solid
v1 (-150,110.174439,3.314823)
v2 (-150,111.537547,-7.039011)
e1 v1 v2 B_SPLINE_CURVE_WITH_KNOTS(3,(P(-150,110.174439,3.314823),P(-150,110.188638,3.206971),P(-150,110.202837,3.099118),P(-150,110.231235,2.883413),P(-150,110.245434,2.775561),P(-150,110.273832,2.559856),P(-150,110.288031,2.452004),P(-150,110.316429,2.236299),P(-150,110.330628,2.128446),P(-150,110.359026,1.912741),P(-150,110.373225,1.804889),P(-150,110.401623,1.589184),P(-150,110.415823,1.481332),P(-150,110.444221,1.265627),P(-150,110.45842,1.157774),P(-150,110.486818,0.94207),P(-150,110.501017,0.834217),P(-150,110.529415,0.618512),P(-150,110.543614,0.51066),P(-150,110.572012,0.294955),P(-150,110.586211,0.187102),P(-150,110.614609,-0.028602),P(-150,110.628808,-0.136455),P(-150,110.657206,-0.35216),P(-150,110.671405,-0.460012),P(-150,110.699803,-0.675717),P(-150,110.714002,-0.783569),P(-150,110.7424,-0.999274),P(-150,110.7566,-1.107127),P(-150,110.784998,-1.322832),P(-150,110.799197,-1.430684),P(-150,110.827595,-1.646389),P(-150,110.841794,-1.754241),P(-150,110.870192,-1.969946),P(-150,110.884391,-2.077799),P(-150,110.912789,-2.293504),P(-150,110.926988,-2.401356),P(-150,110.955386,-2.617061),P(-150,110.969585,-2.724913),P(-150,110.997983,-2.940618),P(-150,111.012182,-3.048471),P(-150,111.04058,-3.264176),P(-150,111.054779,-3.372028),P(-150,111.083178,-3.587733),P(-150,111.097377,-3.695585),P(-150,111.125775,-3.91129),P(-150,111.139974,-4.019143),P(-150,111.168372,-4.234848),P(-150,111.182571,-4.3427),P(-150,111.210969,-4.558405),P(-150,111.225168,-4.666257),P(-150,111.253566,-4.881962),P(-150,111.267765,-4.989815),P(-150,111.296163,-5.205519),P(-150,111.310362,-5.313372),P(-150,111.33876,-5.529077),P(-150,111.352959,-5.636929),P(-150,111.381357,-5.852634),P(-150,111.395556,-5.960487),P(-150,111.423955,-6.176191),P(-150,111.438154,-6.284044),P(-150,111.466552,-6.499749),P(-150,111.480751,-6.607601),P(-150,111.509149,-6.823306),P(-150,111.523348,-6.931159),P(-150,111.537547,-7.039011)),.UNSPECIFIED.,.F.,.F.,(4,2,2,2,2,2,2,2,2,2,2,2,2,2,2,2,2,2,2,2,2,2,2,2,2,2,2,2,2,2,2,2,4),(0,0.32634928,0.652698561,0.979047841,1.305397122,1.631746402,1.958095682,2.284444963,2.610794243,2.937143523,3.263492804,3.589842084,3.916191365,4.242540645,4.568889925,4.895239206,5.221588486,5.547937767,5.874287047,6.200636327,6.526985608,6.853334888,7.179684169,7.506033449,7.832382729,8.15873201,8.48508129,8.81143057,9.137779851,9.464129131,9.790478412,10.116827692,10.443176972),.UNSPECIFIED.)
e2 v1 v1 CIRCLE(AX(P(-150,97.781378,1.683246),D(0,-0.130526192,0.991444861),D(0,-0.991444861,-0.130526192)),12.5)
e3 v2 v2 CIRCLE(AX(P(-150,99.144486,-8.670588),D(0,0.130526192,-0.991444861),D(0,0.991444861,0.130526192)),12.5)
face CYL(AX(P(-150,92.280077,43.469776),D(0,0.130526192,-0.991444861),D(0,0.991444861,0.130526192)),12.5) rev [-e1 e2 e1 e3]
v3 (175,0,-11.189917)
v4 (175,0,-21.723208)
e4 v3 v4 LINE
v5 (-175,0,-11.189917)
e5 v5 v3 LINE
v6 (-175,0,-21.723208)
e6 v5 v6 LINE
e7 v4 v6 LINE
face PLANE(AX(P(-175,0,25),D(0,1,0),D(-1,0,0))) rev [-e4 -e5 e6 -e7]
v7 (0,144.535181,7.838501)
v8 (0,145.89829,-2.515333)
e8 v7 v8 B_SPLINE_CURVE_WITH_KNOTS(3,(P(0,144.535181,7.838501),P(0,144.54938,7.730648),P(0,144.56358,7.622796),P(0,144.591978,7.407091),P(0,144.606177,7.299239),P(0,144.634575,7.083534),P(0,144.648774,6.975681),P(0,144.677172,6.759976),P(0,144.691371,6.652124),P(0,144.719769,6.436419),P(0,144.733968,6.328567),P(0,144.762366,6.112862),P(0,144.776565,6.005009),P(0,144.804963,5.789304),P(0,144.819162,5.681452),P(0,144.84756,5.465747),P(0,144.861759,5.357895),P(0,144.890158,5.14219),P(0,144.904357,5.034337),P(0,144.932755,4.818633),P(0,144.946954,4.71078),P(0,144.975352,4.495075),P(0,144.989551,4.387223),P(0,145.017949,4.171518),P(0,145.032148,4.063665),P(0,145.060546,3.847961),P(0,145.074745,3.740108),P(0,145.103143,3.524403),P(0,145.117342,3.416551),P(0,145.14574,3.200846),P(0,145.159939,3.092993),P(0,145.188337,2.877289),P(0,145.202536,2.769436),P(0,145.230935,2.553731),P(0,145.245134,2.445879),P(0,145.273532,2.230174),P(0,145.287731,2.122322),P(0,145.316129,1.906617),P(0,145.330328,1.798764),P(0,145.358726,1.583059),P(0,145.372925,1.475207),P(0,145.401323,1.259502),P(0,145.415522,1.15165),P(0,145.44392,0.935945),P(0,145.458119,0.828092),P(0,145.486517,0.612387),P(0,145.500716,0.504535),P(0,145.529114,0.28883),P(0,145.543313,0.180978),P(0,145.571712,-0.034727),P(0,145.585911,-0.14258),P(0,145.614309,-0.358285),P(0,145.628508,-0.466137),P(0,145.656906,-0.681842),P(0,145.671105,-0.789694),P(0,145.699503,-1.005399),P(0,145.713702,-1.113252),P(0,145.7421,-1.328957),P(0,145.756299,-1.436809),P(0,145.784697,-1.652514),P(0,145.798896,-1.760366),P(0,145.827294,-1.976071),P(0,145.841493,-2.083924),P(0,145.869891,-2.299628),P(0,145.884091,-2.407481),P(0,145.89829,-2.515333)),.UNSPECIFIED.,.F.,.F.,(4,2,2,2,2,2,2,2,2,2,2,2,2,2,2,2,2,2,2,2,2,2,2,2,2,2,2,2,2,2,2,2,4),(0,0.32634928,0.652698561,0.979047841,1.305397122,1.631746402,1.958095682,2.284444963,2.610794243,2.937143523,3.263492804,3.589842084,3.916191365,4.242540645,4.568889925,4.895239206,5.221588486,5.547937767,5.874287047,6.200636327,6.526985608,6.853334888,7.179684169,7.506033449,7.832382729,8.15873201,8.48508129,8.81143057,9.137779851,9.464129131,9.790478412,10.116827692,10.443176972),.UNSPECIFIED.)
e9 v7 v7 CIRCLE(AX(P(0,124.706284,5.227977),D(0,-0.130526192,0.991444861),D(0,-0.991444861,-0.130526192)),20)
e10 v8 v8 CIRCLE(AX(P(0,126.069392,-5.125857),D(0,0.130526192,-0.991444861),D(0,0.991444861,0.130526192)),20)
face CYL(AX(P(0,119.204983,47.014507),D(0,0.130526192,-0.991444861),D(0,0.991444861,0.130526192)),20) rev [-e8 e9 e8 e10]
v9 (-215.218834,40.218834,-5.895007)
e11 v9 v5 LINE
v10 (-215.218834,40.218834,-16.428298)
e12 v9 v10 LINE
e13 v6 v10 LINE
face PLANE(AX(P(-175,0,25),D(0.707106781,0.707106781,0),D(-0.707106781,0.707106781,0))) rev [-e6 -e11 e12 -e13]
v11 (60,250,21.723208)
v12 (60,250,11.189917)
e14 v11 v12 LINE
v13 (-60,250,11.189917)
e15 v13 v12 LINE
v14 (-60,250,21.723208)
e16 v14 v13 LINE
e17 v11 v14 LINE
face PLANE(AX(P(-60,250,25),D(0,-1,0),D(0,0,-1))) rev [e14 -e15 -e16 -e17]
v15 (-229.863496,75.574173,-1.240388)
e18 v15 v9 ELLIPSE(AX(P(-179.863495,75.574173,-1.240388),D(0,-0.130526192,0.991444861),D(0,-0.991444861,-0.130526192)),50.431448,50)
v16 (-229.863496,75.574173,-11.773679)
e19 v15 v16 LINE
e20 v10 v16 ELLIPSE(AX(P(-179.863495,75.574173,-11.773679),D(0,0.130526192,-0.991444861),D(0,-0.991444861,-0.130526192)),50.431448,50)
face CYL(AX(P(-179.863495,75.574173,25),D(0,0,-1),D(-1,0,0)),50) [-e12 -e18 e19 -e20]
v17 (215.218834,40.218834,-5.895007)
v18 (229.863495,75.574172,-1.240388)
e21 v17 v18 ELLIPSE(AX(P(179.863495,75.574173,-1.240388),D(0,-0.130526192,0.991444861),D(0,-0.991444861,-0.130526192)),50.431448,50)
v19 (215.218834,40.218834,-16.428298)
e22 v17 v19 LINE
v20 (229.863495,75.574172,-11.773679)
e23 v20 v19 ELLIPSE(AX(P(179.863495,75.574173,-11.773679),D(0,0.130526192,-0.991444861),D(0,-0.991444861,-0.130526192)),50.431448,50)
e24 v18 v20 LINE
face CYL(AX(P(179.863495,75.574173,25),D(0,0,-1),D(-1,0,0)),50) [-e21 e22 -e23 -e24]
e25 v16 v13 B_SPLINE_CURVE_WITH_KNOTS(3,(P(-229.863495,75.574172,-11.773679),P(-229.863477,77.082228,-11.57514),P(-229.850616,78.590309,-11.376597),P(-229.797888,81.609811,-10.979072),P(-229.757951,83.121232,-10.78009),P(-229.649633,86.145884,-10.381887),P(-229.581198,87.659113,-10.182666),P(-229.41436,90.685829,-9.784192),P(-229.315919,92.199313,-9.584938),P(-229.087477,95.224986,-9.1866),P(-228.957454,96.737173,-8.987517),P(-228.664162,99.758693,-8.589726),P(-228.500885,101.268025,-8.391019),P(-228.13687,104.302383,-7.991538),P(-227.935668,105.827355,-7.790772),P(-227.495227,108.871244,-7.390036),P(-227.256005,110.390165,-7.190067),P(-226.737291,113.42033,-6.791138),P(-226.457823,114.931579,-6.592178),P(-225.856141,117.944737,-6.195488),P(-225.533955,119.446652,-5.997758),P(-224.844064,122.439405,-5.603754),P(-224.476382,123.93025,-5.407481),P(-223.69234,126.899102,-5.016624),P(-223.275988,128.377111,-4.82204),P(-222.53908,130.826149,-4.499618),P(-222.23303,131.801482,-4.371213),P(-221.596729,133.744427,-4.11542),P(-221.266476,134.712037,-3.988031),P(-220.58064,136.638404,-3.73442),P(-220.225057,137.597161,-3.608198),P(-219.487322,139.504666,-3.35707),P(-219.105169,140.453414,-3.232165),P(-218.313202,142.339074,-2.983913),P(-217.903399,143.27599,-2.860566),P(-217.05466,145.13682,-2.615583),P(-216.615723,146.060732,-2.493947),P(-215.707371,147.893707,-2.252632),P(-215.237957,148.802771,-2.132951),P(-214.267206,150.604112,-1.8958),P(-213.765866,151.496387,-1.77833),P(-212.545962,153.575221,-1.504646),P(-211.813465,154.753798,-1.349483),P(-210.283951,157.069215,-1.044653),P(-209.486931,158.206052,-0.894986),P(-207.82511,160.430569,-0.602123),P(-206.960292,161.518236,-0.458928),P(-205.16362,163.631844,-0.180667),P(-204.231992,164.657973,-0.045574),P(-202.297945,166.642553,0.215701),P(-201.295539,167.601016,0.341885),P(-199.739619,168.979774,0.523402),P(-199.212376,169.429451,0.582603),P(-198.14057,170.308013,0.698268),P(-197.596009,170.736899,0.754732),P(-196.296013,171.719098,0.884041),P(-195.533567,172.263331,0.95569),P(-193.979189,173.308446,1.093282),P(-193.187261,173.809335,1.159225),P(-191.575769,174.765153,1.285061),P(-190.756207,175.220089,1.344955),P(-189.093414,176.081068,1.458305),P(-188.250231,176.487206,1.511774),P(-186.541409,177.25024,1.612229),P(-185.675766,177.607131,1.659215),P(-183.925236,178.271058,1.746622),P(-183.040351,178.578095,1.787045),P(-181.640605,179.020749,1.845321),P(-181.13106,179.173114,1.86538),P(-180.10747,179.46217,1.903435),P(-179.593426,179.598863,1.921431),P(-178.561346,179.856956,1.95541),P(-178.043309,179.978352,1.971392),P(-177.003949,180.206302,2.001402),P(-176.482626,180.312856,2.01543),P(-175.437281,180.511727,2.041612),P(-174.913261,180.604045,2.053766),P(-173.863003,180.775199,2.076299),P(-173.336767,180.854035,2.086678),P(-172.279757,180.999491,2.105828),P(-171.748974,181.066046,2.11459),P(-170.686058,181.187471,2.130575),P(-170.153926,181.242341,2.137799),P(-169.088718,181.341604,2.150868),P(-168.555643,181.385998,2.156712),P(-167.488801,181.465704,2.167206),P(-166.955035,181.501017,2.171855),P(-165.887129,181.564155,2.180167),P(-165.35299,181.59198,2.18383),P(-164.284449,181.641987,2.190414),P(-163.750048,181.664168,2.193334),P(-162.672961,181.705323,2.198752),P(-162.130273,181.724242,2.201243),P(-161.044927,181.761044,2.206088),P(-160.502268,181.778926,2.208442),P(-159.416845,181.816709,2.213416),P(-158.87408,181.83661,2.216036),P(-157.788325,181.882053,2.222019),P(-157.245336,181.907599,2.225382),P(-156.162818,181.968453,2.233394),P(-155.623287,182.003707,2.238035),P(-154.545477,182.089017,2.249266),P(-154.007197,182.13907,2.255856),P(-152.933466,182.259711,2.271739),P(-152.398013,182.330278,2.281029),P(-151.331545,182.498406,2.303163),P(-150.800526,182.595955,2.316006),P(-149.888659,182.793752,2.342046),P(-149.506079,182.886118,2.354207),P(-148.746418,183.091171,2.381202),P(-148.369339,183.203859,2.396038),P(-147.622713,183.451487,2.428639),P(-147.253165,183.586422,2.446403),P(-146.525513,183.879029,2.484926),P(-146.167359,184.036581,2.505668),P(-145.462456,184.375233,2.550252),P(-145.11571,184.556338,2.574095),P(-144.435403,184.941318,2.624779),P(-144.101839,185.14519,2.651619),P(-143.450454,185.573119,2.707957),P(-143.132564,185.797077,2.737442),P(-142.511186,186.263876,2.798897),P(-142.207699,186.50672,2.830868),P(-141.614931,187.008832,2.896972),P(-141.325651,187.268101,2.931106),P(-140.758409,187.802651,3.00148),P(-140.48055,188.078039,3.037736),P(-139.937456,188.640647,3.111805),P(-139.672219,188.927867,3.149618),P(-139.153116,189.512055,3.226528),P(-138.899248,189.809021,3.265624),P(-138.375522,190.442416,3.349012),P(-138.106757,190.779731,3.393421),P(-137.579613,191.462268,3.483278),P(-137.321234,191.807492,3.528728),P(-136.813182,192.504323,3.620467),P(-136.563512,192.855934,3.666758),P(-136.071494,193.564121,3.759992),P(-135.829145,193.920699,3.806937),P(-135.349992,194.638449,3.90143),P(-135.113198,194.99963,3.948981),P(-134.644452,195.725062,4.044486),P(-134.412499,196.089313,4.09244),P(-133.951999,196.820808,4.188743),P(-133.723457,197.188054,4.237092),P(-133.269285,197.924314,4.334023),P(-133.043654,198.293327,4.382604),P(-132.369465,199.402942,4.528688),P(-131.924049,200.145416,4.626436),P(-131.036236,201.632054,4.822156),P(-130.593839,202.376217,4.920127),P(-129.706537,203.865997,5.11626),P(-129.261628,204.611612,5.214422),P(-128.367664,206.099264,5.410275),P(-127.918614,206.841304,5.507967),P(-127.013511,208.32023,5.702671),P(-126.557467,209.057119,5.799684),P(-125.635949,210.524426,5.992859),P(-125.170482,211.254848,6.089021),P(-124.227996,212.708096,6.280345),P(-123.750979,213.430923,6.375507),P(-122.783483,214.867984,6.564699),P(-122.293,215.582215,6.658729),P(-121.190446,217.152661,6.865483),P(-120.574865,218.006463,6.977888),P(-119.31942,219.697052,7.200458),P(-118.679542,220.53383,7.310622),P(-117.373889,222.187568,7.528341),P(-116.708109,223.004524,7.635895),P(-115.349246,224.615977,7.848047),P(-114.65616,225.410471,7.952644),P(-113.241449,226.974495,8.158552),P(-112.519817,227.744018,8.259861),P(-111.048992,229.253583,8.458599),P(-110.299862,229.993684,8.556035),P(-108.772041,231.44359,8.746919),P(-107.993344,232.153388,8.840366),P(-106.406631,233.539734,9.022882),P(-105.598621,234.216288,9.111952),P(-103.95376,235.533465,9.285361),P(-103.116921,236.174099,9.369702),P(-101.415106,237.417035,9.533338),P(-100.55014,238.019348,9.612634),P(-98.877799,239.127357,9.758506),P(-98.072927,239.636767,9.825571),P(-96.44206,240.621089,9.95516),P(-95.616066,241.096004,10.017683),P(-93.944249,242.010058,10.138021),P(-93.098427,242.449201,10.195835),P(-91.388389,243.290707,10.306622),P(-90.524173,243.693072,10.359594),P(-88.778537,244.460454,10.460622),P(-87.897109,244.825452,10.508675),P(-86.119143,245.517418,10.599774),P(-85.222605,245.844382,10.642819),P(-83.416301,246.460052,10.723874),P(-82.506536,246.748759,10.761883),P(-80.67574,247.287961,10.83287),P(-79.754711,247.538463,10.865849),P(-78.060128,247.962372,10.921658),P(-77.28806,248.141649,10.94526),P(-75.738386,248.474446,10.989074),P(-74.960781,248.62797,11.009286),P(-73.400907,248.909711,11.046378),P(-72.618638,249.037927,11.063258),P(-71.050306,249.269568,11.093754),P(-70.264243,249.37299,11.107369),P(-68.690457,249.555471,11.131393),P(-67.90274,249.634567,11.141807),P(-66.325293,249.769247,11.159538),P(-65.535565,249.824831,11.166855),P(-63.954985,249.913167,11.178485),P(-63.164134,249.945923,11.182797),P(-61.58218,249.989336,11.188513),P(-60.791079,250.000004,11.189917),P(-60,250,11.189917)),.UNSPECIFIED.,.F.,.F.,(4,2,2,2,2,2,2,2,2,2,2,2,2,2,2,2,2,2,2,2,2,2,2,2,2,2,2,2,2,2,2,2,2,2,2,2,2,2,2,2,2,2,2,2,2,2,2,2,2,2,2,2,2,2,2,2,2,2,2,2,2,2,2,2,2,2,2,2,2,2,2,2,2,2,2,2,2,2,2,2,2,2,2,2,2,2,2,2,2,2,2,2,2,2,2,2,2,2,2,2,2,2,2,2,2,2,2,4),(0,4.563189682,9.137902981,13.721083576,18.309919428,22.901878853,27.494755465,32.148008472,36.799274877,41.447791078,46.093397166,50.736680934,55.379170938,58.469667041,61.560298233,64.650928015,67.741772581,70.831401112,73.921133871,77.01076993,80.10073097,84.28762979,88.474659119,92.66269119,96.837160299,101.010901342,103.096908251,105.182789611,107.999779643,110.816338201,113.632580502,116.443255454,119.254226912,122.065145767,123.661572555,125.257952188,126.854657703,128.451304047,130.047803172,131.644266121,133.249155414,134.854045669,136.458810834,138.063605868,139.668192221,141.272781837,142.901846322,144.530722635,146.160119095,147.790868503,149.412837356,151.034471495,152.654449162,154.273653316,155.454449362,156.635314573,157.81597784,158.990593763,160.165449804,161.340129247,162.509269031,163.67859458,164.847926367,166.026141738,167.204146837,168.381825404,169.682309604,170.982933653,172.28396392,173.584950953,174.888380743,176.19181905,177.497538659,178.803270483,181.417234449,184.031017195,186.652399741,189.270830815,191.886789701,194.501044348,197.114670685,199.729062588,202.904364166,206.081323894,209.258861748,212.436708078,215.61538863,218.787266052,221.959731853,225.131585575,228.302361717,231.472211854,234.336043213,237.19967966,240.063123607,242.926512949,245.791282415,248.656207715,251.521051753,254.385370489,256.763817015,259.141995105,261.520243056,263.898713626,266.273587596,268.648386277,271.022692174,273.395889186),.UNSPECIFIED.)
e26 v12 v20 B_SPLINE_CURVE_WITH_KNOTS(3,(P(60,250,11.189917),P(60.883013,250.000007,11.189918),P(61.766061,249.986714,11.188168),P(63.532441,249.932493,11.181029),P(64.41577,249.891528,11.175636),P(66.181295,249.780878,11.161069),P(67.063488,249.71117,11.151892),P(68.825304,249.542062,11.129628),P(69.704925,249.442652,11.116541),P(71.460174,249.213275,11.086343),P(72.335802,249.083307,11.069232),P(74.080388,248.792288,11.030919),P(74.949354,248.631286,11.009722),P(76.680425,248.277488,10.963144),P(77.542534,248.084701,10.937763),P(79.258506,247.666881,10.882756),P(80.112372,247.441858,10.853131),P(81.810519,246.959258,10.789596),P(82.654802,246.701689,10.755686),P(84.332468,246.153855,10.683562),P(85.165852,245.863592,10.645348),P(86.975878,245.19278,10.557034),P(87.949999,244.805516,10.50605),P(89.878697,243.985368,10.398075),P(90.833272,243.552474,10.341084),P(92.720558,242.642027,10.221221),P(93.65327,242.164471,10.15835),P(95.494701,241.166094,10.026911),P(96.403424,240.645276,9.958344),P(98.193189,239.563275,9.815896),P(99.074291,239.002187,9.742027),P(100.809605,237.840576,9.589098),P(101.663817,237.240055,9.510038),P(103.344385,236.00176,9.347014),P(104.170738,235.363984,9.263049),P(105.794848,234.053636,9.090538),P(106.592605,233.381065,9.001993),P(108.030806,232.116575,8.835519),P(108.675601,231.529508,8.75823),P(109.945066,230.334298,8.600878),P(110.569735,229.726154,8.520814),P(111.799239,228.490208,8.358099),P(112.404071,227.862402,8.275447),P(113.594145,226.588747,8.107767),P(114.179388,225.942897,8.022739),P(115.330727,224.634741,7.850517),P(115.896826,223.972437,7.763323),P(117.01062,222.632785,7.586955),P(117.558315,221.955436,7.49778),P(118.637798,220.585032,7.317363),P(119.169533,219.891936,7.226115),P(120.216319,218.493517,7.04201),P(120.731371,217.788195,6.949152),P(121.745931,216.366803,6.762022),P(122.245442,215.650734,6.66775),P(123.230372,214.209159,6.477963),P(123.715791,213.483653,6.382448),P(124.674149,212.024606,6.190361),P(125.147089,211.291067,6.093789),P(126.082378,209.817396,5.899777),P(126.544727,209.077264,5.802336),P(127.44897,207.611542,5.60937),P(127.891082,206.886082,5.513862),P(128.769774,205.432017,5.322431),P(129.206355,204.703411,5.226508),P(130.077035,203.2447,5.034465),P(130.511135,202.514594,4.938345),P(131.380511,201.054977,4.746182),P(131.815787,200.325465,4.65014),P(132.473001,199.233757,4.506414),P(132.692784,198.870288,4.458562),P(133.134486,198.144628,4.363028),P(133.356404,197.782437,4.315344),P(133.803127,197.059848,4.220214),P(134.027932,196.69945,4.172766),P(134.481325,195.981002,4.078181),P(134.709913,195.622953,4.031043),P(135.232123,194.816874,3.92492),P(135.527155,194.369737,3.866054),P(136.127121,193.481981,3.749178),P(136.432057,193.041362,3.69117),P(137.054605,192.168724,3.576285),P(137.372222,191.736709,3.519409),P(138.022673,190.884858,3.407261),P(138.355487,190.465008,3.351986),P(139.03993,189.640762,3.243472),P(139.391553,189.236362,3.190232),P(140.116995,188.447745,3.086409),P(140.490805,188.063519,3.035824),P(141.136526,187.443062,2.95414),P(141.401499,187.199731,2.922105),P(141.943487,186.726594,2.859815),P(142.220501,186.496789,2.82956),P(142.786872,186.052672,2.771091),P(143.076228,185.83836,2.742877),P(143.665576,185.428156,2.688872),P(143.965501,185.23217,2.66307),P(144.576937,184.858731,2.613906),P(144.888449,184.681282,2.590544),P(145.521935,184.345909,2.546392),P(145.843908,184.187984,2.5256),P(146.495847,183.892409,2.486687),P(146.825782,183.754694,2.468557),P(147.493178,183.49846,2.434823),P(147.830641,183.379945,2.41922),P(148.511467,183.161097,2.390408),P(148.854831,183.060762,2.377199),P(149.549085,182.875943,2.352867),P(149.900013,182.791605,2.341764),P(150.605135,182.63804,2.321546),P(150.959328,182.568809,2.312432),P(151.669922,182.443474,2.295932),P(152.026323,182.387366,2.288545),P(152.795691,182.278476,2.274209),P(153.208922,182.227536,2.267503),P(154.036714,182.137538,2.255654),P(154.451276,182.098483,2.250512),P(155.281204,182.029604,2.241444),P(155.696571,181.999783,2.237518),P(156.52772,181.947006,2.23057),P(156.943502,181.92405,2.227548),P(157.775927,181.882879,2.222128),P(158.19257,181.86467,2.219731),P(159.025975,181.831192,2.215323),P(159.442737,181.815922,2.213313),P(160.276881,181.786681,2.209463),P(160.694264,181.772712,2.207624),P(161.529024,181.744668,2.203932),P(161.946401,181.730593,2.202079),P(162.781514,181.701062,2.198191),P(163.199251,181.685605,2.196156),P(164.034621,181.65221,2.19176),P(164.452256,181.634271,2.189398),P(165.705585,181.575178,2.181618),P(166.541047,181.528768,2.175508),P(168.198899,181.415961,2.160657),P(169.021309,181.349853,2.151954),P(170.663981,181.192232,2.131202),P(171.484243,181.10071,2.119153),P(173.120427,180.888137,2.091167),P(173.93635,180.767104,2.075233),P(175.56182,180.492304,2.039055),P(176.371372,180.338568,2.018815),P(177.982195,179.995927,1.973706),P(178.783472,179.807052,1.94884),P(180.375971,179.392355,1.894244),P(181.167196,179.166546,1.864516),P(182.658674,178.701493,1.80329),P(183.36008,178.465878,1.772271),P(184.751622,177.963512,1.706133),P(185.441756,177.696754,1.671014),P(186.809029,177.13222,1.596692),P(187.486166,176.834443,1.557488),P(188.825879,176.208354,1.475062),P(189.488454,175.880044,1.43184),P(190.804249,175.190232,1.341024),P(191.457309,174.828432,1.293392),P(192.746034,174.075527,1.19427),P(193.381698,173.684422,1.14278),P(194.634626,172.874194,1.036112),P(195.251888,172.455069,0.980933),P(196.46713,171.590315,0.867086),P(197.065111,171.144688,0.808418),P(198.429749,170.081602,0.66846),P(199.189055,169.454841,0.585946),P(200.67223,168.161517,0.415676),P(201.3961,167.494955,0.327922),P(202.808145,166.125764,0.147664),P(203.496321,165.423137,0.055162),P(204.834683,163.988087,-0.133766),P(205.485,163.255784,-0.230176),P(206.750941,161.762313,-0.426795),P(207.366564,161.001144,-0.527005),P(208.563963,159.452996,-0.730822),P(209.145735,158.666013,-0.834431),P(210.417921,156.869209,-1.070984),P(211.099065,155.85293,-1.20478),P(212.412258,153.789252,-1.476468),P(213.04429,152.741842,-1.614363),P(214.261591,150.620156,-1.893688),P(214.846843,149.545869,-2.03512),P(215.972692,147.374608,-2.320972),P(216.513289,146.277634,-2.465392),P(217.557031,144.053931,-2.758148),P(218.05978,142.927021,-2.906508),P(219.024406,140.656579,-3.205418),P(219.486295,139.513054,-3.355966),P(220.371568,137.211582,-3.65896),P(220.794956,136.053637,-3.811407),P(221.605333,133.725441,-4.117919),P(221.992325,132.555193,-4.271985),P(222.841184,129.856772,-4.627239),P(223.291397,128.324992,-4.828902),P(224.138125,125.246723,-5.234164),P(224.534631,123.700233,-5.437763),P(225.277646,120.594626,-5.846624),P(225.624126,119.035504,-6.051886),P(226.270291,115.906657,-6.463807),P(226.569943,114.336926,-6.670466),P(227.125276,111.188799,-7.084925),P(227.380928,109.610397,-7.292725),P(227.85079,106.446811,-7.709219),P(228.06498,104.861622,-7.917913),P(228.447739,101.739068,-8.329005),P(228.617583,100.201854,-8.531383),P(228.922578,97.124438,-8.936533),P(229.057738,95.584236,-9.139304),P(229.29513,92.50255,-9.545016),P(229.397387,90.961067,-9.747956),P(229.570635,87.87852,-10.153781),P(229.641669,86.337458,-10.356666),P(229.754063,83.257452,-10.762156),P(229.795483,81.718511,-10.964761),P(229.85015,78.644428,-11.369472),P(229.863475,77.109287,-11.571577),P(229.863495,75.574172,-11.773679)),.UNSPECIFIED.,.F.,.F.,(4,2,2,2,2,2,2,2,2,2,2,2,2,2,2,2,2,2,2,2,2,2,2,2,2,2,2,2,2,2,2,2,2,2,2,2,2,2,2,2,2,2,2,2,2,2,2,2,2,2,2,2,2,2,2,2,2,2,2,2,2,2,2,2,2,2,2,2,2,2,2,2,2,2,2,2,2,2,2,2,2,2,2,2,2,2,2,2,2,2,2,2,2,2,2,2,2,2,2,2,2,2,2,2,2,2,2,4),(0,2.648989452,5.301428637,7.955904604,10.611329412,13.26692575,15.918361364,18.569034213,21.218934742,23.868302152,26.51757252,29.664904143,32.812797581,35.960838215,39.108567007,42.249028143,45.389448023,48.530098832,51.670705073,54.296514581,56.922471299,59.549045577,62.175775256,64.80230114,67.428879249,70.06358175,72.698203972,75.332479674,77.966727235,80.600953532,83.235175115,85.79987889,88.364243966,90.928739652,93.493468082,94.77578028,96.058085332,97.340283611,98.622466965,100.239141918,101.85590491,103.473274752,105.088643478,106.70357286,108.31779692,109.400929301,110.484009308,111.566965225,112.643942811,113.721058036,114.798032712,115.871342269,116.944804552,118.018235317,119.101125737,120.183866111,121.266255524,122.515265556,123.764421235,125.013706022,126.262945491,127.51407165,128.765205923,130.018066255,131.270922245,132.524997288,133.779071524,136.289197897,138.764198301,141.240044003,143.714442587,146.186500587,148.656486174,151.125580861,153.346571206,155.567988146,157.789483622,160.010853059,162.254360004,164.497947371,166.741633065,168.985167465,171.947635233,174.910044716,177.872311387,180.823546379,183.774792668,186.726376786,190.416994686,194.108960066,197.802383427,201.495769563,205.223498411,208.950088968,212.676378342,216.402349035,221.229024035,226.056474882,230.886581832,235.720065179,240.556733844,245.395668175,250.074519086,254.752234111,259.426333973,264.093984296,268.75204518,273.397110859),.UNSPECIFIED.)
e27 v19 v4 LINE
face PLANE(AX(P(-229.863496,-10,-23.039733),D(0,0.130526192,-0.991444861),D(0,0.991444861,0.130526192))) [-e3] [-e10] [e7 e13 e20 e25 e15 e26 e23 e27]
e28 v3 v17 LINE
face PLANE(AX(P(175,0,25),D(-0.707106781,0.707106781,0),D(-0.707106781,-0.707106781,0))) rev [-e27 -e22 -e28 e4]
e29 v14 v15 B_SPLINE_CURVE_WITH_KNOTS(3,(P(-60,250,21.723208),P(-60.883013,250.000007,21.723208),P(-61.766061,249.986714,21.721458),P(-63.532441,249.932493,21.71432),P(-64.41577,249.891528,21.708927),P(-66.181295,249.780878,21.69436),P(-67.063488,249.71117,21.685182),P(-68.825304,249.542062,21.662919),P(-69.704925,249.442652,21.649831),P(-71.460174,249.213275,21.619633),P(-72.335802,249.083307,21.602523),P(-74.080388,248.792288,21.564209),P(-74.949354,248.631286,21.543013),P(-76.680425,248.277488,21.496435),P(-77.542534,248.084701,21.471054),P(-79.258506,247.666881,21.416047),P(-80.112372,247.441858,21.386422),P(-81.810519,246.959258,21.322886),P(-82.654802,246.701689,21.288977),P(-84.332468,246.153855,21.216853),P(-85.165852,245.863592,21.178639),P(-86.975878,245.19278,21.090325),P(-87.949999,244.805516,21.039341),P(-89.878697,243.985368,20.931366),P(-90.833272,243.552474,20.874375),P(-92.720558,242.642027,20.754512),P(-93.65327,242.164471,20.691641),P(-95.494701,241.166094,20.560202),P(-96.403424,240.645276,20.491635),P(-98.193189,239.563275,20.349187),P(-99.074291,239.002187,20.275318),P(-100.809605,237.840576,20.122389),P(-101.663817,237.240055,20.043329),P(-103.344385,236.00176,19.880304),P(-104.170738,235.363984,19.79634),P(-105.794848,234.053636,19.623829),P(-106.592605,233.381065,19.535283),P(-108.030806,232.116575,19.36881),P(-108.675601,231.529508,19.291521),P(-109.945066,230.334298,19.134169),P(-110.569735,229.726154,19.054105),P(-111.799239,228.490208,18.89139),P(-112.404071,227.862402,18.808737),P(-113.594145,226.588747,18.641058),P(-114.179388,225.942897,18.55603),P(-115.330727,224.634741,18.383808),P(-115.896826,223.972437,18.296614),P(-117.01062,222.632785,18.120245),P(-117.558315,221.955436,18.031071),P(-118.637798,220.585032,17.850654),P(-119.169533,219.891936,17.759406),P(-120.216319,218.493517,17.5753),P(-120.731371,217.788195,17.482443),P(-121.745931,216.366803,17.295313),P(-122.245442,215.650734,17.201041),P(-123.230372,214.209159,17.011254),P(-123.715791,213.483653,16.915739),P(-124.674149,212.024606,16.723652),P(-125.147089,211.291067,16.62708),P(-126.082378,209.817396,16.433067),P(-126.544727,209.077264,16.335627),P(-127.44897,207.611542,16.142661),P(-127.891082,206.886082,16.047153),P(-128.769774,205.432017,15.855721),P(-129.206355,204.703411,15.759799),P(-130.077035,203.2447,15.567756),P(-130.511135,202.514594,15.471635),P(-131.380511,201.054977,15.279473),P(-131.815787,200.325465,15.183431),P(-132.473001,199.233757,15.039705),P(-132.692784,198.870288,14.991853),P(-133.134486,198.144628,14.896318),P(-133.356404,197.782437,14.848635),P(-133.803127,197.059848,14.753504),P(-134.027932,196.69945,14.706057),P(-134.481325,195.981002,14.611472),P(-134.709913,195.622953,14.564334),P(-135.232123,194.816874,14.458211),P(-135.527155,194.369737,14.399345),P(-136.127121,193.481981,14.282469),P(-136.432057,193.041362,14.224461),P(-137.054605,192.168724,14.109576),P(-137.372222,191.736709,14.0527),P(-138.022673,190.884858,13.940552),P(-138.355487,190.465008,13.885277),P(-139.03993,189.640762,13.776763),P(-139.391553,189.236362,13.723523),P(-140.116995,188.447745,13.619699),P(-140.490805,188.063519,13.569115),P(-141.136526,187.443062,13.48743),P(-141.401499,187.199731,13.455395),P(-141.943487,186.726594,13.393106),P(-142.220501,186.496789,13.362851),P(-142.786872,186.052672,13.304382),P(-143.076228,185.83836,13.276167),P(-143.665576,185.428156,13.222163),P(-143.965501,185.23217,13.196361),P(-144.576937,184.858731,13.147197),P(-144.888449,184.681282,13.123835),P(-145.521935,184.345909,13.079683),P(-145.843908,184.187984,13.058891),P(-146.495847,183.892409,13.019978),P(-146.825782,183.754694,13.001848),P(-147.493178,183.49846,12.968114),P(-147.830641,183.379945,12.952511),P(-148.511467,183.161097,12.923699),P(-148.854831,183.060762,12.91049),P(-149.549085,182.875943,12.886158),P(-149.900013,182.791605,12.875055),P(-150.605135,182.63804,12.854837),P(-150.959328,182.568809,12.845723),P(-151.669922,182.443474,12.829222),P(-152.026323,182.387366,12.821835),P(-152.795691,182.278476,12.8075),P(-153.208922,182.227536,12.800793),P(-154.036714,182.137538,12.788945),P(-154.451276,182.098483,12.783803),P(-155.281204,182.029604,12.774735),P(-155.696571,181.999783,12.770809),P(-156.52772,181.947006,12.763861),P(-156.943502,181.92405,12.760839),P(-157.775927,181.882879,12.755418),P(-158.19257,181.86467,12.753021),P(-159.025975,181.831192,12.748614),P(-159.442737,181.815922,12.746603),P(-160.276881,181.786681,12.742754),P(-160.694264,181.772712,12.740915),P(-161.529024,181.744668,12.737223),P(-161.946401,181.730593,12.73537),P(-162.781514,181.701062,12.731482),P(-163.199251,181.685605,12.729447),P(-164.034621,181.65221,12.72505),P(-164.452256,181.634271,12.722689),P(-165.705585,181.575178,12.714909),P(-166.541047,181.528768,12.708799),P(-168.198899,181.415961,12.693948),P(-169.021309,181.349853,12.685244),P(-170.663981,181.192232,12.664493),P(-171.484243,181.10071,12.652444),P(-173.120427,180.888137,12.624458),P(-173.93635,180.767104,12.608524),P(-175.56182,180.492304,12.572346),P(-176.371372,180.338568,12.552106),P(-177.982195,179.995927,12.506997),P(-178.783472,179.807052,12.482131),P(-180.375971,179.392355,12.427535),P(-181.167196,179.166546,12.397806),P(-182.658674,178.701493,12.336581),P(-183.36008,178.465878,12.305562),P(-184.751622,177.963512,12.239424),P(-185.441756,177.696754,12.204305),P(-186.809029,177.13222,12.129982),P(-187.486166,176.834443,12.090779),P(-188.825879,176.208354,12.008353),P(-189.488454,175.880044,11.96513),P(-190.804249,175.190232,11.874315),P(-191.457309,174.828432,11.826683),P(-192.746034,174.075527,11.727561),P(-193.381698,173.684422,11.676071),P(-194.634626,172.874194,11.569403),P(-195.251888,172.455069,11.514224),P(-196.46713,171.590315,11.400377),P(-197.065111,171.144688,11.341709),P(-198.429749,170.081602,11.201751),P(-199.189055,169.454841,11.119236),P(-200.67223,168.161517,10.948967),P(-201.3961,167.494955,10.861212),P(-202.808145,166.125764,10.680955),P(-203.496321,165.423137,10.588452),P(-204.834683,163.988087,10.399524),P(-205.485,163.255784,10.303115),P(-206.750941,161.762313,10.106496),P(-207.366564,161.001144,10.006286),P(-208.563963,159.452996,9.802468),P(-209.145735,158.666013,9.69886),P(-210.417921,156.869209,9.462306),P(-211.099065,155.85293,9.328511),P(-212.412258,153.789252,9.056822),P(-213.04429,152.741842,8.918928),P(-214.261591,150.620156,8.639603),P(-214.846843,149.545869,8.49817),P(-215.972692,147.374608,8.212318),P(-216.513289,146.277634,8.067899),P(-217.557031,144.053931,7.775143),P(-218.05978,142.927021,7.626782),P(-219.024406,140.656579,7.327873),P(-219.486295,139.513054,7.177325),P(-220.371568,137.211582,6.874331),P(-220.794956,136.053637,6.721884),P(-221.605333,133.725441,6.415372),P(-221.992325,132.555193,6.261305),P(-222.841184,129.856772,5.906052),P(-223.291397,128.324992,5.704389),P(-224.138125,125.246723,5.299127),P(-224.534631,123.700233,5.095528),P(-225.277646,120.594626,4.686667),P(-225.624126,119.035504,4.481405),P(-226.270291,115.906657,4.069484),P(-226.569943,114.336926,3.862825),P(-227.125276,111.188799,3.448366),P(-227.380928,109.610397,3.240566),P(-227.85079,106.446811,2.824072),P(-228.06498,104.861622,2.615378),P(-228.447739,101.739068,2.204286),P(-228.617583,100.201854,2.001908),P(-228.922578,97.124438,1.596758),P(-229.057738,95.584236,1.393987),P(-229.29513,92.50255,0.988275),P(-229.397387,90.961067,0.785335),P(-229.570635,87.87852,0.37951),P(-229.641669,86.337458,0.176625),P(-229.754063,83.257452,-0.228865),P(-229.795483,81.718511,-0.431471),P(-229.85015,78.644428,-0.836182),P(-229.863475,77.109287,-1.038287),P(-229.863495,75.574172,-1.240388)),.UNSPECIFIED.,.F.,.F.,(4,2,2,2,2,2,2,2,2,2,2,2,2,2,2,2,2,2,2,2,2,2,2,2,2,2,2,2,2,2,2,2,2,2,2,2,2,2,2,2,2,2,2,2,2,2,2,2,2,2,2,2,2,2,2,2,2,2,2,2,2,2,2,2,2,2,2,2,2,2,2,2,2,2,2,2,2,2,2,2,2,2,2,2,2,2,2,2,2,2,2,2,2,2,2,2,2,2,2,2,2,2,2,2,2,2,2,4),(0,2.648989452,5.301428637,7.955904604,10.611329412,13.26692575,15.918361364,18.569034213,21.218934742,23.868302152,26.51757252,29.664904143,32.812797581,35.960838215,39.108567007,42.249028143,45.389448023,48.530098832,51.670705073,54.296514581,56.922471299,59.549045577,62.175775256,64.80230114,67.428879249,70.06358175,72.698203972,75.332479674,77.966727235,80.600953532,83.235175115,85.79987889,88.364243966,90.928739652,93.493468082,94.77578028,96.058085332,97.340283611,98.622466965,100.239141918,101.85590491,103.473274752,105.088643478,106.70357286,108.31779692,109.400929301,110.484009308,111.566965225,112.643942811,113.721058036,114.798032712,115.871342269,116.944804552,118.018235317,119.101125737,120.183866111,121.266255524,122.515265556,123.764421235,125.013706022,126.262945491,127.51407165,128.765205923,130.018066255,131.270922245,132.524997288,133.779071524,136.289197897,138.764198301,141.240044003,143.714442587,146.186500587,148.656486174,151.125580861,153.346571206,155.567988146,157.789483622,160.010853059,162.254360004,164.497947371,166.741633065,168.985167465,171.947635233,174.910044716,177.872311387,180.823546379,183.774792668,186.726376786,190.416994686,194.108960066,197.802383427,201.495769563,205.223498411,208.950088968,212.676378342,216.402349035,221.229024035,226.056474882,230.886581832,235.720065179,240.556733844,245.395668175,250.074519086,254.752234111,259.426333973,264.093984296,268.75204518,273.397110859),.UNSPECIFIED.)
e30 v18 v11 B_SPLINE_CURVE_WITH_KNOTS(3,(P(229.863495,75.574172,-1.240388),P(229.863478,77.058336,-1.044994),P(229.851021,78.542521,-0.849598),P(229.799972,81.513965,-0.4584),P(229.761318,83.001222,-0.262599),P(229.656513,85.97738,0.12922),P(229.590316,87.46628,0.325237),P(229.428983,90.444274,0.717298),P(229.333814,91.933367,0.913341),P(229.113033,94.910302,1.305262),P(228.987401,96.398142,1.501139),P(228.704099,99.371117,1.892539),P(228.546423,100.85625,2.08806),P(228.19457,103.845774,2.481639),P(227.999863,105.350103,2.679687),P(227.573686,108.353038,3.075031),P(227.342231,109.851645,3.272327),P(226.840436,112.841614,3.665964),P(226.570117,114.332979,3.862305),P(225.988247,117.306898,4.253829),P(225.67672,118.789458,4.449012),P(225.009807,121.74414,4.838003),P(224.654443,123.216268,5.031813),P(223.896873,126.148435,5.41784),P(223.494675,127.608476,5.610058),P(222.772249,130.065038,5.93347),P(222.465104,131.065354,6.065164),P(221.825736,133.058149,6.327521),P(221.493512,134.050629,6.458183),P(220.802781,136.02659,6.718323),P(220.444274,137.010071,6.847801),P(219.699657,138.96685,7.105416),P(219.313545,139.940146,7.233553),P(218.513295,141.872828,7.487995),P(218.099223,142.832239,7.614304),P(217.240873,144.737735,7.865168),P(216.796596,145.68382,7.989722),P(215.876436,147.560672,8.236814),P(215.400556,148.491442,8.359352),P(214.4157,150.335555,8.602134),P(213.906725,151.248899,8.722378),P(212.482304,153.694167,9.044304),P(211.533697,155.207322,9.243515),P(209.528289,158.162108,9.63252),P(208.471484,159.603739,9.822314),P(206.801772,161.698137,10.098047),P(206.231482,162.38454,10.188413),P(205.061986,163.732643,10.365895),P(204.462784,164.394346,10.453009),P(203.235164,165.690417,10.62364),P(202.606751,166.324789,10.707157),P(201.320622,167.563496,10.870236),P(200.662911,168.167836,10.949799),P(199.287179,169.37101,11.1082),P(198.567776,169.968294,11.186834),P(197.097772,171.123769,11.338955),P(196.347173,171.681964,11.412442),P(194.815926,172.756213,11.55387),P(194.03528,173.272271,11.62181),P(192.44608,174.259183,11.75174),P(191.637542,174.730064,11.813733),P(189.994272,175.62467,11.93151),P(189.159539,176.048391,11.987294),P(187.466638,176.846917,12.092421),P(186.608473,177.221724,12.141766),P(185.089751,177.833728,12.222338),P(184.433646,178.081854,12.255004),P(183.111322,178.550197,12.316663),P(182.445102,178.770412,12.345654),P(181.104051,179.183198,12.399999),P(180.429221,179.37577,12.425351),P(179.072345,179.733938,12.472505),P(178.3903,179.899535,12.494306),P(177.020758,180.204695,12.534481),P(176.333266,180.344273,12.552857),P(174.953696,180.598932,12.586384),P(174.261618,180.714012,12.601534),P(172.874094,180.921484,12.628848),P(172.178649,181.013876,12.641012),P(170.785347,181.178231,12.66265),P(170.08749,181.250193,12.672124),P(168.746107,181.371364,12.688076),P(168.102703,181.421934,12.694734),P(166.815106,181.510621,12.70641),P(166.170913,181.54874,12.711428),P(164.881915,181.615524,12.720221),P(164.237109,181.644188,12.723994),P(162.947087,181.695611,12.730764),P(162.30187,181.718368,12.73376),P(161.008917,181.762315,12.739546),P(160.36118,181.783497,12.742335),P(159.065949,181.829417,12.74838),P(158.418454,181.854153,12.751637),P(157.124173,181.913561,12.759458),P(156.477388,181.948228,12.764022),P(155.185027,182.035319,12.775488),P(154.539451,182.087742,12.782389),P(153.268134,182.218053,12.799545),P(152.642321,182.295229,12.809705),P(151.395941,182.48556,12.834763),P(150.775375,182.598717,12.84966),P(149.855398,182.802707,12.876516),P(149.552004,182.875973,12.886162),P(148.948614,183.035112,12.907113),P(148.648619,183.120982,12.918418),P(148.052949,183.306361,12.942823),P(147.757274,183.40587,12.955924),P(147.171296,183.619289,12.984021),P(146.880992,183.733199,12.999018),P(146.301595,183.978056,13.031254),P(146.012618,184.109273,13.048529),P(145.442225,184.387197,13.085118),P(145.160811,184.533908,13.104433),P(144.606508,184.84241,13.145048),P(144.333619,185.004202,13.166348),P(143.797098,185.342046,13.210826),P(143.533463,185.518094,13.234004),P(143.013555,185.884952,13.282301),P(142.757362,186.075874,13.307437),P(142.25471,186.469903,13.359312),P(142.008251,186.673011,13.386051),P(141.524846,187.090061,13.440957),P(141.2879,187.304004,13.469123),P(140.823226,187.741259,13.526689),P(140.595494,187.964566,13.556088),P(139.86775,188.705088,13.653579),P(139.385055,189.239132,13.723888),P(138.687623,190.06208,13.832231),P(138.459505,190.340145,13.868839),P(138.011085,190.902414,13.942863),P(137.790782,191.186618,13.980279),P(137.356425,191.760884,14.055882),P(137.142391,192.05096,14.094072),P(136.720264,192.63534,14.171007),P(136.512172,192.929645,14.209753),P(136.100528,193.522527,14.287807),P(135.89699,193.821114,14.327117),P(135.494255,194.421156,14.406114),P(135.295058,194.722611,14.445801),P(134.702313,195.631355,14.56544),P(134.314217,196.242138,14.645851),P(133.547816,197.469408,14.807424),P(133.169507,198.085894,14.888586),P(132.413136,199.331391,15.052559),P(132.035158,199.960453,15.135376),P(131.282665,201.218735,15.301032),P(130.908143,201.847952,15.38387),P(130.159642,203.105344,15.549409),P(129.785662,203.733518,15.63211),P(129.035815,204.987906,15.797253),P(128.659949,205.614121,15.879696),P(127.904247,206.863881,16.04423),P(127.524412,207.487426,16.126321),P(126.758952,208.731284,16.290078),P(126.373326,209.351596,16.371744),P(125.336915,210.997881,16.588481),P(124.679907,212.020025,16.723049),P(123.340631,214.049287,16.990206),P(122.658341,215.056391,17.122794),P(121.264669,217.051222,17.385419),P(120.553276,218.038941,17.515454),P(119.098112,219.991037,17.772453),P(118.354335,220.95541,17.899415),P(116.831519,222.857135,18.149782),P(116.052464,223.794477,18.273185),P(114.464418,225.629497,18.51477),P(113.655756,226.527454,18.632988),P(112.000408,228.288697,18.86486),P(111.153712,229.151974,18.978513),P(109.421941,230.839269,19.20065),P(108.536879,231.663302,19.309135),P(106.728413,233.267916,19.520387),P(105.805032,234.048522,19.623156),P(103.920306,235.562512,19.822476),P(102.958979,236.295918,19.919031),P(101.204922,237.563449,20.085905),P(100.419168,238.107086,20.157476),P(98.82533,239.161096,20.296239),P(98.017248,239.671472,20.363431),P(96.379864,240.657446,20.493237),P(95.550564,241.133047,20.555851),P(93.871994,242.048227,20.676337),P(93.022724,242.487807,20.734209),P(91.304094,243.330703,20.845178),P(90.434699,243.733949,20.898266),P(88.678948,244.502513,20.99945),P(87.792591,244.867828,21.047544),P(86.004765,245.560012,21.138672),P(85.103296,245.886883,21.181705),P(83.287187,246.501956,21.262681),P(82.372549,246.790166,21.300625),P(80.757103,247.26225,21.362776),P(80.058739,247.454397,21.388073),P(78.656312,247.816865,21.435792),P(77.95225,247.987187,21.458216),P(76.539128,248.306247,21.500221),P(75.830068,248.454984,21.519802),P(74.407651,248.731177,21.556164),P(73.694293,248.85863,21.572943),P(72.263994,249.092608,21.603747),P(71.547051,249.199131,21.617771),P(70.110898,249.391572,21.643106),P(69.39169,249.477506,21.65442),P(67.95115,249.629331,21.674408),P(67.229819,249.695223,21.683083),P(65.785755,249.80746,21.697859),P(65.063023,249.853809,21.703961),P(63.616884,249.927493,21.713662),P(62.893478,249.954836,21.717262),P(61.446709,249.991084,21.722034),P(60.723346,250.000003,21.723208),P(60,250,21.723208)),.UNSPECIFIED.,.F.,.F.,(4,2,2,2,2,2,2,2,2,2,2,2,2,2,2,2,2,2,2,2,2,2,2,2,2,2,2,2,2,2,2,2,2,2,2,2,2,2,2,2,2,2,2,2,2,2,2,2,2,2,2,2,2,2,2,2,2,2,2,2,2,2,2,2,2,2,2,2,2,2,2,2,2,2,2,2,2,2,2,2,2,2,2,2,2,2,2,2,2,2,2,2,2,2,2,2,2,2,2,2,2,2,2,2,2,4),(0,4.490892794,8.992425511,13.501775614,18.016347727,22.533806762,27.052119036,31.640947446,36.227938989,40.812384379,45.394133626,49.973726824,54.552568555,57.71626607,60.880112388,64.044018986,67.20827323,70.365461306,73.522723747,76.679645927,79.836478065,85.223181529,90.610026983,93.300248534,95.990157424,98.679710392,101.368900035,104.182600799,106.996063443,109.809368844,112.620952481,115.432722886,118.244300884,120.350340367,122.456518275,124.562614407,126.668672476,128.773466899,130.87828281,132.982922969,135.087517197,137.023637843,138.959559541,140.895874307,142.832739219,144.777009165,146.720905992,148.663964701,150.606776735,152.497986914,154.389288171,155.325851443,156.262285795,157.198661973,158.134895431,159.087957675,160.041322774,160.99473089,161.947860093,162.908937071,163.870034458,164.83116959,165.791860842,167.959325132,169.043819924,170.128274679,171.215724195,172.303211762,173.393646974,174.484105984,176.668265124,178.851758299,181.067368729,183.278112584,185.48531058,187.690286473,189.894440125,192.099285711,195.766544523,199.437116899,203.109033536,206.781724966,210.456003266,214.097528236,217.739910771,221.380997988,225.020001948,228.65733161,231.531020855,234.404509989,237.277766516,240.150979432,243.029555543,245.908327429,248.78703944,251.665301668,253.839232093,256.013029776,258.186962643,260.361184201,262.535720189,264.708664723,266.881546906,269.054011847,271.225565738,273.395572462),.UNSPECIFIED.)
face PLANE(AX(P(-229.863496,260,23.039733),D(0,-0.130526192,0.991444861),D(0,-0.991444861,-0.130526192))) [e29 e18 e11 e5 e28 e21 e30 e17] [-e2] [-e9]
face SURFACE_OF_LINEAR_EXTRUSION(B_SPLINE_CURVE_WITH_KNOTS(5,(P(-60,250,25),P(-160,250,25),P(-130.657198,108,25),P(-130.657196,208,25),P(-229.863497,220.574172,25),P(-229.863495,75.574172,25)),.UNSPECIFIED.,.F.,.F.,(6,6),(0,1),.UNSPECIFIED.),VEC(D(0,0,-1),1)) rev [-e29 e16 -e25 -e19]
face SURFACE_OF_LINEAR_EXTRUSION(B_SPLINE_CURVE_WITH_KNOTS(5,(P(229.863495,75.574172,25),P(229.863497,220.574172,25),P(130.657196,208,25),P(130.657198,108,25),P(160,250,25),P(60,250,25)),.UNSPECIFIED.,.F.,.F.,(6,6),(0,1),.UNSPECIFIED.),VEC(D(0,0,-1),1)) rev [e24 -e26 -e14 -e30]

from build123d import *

# Parameters (mm, degrees)
BOSS_EXTRUDE1_START     = -25
BOSS_EXTRUDE1_DEPTH     = 50
CUT_EXTRUDE1_DEPTH      = 341.53226913
CUT_EXTRUDE1_DEPTH_BACK = 341.53226913
CUT_EXTRUDE2_DEPTH      = 341.286795308
CUT_EXTRUDE2_DEPTH_BACK = 341.286795308
SKETCH4_R               = 20
CUT_EXTRUDE3_DEPTH      = 341.286795308
CUT_EXTRUDE3_DEPTH_BACK = 341.286795308
SKETCH6_R               = 12.5


# Read off the part's stored shape, not the designer's step: Boss-Extrude1
with BuildPart() as part:
    # Boss-Extrude1 outline → Boss-Extrude1 (new body)
    with BuildSketch(Plane.XY.offset(BOSS_EXTRUDE1_START)):
        with BuildLine():
            Line((175, 0), (215.218833807, 40.218833807))
            ThreePointArc((215.218833807, 40.218833807), (226.057471223, 56.440000887), (229.863494748, 75.574172084))
            add(Edge.make_bspline(
                [(229.863494748, 75.574172084), (229.863497015, 220.574172084), (130.657195822, 208), (130.657198498, 108), (160, 250), (60, 250)],
                knots=[0, 0, 0, 0, 0, 0, 1, 1, 1, 1, 1, 1], degree=5))
            Line((60, 250), (-60, 250))
            add(Edge.make_bspline(
                [(-60, 250), (-160, 250), (-130.657198498, 108), (-130.657195822, 208), (-229.863497015, 220.574172084), (-229.863494748, 75.574172084)],
                knots=[0, 0, 0, 0, 0, 0, 1, 1, 1, 1, 1, 1], degree=5))
            ThreePointArc((-229.863494748, 75.574172084), (-226.057471223, 56.440000887), (-215.218833807, 40.218833807))
            Line((-215.218833807, 40.218833807), (-175, 0))
            Line((-175, 0), (175, 0))
        make_face()
    extrude(amount=BOSS_EXTRUDE1_DEPTH)

    # Sketch2 → Cut-Extrude1 (cut, two sides: drawn at the far end of the back side and taken through both)
    with BuildSketch(Plane(origin=(0, 0, 0), x_dir=(0, 0, -1), z_dir=(1, 0, 0)).offset(-CUT_EXTRUDE1_DEPTH_BACK)):
        Polygon((23.039732542, -10), (-12.506441807, 260), (35, 260), (35, -10), align=None)
        Polygon((-23.039732542, 260), (12.506441807, -10), (-35, -10), (-35, 260), align=None)
    extrude(amount=CUT_EXTRUDE1_DEPTH + CUT_EXTRUDE1_DEPTH_BACK, mode=Mode.SUBTRACT)

    # Sketch4 → Cut-Extrude2 (cut, two sides: drawn at the far end of the back side and taken through both)
    with BuildSketch(Plane(origin=(0, 2.811189919, -21.353107392), x_dir=(-1, 0, 0), z_dir=(0, 0.13052619222005532, -0.99144486137381)).offset(-CUT_EXTRUDE2_DEPTH_BACK)):
        with Locations(Location((0, 124.321792579, 0), (0, 0, 90))):
            Circle(SKETCH4_R)
    extrude(amount=CUT_EXTRUDE2_DEPTH + CUT_EXTRUDE2_DEPTH_BACK, mode=Mode.SUBTRACT)

    # Sketch6 → Cut-Extrude3 (cut, two sides: drawn at the far end of the back side and taken through both)
    with BuildSketch(Plane(origin=(0, 2.811189919, -21.353107392), x_dir=(-1, 0, 0), z_dir=(0, 0.13052619222005532, -0.99144486137381)).offset(-CUT_EXTRUDE3_DEPTH_BACK)):
        with Locations(Location((150, 97.164552434, 0), (0, 0, 90))):
            Circle(SKETCH6_R)
    extrude(amount=CUT_EXTRUDE3_DEPTH + CUT_EXTRUDE3_DEPTH_BACK, mode=Mode.SUBTRACT)


solid = part.part
